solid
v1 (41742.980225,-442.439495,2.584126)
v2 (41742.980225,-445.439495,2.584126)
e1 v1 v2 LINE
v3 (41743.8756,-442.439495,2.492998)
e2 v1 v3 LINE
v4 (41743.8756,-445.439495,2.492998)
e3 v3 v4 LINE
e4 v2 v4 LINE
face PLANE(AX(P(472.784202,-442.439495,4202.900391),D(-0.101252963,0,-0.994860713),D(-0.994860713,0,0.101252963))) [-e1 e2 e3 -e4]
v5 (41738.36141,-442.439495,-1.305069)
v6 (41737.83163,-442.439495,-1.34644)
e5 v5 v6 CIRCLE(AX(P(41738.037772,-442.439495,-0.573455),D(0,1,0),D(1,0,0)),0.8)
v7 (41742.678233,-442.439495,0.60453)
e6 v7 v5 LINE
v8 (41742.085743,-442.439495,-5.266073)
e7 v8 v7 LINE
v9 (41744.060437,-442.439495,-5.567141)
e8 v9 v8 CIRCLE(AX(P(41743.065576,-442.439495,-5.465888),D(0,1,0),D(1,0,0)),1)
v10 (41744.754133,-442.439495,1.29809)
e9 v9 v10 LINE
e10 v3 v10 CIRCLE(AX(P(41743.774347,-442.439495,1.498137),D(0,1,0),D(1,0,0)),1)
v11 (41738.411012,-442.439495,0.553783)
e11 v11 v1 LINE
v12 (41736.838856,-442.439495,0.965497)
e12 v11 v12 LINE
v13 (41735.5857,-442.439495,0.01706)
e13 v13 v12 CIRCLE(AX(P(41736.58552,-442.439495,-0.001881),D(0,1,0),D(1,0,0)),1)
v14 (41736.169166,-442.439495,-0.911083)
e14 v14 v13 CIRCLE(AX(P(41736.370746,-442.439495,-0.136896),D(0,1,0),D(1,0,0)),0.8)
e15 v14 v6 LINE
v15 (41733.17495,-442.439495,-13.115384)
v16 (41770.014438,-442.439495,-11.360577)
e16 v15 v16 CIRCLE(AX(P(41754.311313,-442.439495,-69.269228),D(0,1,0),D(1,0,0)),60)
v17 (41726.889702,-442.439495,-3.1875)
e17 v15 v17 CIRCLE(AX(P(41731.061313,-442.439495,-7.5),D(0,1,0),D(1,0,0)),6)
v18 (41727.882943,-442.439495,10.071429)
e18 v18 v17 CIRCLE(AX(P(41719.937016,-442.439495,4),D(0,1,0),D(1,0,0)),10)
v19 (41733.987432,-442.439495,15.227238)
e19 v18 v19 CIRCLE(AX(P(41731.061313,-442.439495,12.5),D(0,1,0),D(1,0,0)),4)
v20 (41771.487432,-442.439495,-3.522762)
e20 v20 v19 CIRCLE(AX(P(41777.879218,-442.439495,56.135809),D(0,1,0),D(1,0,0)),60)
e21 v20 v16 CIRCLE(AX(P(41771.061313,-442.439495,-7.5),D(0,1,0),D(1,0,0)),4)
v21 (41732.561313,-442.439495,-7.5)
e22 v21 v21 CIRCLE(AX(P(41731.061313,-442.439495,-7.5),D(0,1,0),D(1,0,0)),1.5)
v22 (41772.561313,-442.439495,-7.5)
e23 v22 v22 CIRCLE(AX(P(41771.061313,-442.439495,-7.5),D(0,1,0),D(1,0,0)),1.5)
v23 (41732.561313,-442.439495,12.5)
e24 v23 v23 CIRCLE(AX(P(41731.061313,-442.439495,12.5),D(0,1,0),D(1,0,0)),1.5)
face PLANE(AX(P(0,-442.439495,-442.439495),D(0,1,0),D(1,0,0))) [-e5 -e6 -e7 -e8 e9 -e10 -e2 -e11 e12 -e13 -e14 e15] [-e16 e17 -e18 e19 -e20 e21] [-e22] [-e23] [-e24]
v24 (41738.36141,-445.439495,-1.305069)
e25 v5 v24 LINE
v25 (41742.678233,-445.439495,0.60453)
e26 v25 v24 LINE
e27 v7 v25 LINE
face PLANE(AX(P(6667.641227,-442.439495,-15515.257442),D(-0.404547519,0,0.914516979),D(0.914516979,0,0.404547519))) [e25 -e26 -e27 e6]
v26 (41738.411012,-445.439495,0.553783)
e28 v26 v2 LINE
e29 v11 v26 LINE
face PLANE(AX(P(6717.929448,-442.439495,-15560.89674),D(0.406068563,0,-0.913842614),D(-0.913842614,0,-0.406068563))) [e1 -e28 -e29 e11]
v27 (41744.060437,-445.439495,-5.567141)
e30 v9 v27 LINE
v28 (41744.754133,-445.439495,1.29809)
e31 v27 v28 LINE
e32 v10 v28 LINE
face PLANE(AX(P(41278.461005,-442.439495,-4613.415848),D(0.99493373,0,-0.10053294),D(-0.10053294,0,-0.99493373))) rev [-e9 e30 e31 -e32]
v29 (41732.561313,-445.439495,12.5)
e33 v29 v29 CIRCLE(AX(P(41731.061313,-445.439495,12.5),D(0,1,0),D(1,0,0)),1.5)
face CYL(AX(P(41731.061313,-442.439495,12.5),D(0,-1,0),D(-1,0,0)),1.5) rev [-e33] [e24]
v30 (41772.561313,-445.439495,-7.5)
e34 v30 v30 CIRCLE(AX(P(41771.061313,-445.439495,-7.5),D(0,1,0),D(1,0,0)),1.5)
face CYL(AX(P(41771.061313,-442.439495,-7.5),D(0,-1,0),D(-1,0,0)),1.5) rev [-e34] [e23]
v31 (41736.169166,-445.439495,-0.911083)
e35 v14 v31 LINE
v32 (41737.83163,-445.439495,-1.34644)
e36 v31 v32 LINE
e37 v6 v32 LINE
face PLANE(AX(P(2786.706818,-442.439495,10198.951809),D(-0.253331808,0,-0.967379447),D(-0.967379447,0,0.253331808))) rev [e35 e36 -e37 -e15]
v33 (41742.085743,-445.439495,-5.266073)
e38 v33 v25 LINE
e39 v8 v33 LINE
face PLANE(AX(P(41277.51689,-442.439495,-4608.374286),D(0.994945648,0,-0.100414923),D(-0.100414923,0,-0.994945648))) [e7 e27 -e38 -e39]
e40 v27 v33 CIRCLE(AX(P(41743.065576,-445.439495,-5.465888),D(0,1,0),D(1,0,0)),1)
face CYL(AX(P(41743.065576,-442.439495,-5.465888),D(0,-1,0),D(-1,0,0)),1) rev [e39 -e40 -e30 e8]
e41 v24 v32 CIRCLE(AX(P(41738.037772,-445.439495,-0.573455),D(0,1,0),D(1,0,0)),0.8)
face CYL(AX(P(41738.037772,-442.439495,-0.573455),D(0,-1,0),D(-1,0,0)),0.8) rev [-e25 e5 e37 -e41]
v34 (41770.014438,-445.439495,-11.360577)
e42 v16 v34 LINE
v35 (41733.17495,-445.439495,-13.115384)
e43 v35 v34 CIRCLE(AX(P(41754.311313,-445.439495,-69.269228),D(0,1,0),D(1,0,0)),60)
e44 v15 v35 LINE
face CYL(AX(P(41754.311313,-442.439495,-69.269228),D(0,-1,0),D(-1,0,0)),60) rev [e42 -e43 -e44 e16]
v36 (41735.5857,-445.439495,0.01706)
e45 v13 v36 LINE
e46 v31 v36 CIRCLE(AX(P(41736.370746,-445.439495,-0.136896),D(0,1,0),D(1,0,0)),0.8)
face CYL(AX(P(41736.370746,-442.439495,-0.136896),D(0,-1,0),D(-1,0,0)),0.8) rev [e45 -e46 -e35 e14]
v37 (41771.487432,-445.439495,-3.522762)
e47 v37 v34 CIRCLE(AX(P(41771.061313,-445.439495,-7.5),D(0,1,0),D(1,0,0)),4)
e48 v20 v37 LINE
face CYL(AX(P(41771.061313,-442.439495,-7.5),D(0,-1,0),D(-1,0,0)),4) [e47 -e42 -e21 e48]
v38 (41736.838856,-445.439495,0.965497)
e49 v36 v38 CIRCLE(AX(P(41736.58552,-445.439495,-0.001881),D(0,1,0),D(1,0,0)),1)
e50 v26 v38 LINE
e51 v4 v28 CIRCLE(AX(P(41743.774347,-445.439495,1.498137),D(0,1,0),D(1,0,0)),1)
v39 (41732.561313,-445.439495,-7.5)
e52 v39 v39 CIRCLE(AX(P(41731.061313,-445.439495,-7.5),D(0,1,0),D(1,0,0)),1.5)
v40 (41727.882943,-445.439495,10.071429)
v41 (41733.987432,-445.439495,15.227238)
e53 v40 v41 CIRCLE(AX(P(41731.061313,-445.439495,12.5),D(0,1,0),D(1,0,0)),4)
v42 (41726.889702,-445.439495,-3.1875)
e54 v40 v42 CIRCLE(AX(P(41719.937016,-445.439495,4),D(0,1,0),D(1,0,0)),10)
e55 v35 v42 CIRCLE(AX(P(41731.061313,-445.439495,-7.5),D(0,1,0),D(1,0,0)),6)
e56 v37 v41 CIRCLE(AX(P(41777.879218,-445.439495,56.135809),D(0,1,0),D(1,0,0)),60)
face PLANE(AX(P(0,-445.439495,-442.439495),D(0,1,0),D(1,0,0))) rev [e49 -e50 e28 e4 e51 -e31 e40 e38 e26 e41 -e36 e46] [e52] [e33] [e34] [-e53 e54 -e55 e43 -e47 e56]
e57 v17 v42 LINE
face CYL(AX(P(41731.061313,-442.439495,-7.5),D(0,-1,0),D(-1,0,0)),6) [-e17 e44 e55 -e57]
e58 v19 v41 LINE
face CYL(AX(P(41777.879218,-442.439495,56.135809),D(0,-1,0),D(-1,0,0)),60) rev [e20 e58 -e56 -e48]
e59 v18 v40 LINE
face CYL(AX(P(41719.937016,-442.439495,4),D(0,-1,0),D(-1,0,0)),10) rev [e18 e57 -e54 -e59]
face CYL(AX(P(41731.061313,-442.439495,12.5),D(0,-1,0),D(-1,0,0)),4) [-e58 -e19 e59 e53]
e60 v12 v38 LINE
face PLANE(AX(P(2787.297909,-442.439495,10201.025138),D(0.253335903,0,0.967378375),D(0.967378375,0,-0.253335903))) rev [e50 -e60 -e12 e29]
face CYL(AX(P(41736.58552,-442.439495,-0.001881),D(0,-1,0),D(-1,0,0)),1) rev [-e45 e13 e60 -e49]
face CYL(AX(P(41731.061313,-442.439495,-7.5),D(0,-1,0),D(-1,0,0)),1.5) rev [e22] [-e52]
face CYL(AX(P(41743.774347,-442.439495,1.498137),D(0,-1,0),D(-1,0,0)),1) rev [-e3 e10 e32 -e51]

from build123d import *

# Parameters (mm, degrees)
SALIENTE_EXTRUIR1_OUTLINE_R = 1.5
SALIENTE_EXTRUIR1_DEPTH     = 3
S_LIDO_MOVER_COPIAR1_ANGLE  = 90


# Read off the part's stored shape, not the designer's step: Saliente-Extruir1
with BuildPart() as part:
    # Saliente-Extruir1 outline → Saliente-Extruir1 (new body)
    with BuildSketch(Plane.XY):
        with BuildLine():
            ThreePointArc((41771.487432324, -438.916733549), (41774.992492467, -434.200692189), (41770.014438295, -431.078918755))
            ThreePointArc((41770.014438295, -431.078918755), (41751.456517689, -433.102313751), (41733.174949659, -429.324111148))
            ThreePointArc((41733.174949659, -429.324111148), (41725.991842174, -431.730062122), (41726.889701646, -439.251995491))
            ThreePointArc((41726.889701646, -439.251995491), (41729.909074744, -445.69247761), (41727.882942515, -452.510924062))
            ThreePointArc((41727.882942515, -452.510924062), (41728.480324995, -457.995391332), (41733.987432324, -457.666733549))
            ThreePointArc((41733.987432324, -457.666733549), (41751.046402032, -444.909672965), (41771.487432324, -438.916733549))
        make_face()
        with Locations((41731.061313295, -454.939495491)):
            Circle(SALIENTE_EXTRUIR1_OUTLINE_R, mode=Mode.SUBTRACT)
        with BuildLine():
            Line((41738.411012413, -442.993278413), (41736.838856305, -443.404992792))
            ThreePointArc((41736.838856305, -443.404992792), (41735.982036246, -443.234989406), (41735.585699802, -442.456555601))
            ThreePointArc((41735.585699802, -442.456555601), (41735.69345686, -441.876829753), (41736.169165633, -441.52841218))
            Line((41736.169165633, -441.52841218), (41737.831630416, -441.093055392))
            ThreePointArc((41737.831630416, -441.093055392), (41738.100055673, -441.068468468), (41738.361410126, -441.134426674))
            Line((41738.361410126, -441.134426674), (41742.678233483, -443.044025097))
            Line((41742.678233483, -443.044025097), (41742.08574273, -437.173422628))
            ThreePointArc((41742.08574273, -437.173422628), (41742.914855043, -435.985031701), (41744.060436871, -436.872354922))
            Line((41744.060436871, -436.872354922), (41744.754133415, -443.73758562))
            ThreePointArc((41744.754133415, -443.73758562), (41744.580022463, -444.529990261), (41743.875600122, -444.932493559))
            Line((41743.875600122, -444.932493559), (41742.980225481, -445.023621226))
            Line((41742.980225481, -445.023621226), (41738.411012413, -442.993278413))
        make_face(mode=Mode.SUBTRACT)
        with Locations((41731.061313295, -434.939495491)):
            Circle(SALIENTE_EXTRUIR1_OUTLINE_R, mode=Mode.SUBTRACT)
        with Locations((41771.061313295, -434.939495491)):
            Circle(SALIENTE_EXTRUIR1_OUTLINE_R, mode=Mode.SUBTRACT)
    extrude(amount=SALIENTE_EXTRUIR1_DEPTH)


with BuildPart() as part_1:
    # Sólido-Mover/Copiar1: moved
    add(part.part.rotate(Axis((0, -443.939495491, 1.5), (-1, 0, 0)), S_LIDO_MOVER_COPIAR1_ANGLE))


solid = part_1.part
